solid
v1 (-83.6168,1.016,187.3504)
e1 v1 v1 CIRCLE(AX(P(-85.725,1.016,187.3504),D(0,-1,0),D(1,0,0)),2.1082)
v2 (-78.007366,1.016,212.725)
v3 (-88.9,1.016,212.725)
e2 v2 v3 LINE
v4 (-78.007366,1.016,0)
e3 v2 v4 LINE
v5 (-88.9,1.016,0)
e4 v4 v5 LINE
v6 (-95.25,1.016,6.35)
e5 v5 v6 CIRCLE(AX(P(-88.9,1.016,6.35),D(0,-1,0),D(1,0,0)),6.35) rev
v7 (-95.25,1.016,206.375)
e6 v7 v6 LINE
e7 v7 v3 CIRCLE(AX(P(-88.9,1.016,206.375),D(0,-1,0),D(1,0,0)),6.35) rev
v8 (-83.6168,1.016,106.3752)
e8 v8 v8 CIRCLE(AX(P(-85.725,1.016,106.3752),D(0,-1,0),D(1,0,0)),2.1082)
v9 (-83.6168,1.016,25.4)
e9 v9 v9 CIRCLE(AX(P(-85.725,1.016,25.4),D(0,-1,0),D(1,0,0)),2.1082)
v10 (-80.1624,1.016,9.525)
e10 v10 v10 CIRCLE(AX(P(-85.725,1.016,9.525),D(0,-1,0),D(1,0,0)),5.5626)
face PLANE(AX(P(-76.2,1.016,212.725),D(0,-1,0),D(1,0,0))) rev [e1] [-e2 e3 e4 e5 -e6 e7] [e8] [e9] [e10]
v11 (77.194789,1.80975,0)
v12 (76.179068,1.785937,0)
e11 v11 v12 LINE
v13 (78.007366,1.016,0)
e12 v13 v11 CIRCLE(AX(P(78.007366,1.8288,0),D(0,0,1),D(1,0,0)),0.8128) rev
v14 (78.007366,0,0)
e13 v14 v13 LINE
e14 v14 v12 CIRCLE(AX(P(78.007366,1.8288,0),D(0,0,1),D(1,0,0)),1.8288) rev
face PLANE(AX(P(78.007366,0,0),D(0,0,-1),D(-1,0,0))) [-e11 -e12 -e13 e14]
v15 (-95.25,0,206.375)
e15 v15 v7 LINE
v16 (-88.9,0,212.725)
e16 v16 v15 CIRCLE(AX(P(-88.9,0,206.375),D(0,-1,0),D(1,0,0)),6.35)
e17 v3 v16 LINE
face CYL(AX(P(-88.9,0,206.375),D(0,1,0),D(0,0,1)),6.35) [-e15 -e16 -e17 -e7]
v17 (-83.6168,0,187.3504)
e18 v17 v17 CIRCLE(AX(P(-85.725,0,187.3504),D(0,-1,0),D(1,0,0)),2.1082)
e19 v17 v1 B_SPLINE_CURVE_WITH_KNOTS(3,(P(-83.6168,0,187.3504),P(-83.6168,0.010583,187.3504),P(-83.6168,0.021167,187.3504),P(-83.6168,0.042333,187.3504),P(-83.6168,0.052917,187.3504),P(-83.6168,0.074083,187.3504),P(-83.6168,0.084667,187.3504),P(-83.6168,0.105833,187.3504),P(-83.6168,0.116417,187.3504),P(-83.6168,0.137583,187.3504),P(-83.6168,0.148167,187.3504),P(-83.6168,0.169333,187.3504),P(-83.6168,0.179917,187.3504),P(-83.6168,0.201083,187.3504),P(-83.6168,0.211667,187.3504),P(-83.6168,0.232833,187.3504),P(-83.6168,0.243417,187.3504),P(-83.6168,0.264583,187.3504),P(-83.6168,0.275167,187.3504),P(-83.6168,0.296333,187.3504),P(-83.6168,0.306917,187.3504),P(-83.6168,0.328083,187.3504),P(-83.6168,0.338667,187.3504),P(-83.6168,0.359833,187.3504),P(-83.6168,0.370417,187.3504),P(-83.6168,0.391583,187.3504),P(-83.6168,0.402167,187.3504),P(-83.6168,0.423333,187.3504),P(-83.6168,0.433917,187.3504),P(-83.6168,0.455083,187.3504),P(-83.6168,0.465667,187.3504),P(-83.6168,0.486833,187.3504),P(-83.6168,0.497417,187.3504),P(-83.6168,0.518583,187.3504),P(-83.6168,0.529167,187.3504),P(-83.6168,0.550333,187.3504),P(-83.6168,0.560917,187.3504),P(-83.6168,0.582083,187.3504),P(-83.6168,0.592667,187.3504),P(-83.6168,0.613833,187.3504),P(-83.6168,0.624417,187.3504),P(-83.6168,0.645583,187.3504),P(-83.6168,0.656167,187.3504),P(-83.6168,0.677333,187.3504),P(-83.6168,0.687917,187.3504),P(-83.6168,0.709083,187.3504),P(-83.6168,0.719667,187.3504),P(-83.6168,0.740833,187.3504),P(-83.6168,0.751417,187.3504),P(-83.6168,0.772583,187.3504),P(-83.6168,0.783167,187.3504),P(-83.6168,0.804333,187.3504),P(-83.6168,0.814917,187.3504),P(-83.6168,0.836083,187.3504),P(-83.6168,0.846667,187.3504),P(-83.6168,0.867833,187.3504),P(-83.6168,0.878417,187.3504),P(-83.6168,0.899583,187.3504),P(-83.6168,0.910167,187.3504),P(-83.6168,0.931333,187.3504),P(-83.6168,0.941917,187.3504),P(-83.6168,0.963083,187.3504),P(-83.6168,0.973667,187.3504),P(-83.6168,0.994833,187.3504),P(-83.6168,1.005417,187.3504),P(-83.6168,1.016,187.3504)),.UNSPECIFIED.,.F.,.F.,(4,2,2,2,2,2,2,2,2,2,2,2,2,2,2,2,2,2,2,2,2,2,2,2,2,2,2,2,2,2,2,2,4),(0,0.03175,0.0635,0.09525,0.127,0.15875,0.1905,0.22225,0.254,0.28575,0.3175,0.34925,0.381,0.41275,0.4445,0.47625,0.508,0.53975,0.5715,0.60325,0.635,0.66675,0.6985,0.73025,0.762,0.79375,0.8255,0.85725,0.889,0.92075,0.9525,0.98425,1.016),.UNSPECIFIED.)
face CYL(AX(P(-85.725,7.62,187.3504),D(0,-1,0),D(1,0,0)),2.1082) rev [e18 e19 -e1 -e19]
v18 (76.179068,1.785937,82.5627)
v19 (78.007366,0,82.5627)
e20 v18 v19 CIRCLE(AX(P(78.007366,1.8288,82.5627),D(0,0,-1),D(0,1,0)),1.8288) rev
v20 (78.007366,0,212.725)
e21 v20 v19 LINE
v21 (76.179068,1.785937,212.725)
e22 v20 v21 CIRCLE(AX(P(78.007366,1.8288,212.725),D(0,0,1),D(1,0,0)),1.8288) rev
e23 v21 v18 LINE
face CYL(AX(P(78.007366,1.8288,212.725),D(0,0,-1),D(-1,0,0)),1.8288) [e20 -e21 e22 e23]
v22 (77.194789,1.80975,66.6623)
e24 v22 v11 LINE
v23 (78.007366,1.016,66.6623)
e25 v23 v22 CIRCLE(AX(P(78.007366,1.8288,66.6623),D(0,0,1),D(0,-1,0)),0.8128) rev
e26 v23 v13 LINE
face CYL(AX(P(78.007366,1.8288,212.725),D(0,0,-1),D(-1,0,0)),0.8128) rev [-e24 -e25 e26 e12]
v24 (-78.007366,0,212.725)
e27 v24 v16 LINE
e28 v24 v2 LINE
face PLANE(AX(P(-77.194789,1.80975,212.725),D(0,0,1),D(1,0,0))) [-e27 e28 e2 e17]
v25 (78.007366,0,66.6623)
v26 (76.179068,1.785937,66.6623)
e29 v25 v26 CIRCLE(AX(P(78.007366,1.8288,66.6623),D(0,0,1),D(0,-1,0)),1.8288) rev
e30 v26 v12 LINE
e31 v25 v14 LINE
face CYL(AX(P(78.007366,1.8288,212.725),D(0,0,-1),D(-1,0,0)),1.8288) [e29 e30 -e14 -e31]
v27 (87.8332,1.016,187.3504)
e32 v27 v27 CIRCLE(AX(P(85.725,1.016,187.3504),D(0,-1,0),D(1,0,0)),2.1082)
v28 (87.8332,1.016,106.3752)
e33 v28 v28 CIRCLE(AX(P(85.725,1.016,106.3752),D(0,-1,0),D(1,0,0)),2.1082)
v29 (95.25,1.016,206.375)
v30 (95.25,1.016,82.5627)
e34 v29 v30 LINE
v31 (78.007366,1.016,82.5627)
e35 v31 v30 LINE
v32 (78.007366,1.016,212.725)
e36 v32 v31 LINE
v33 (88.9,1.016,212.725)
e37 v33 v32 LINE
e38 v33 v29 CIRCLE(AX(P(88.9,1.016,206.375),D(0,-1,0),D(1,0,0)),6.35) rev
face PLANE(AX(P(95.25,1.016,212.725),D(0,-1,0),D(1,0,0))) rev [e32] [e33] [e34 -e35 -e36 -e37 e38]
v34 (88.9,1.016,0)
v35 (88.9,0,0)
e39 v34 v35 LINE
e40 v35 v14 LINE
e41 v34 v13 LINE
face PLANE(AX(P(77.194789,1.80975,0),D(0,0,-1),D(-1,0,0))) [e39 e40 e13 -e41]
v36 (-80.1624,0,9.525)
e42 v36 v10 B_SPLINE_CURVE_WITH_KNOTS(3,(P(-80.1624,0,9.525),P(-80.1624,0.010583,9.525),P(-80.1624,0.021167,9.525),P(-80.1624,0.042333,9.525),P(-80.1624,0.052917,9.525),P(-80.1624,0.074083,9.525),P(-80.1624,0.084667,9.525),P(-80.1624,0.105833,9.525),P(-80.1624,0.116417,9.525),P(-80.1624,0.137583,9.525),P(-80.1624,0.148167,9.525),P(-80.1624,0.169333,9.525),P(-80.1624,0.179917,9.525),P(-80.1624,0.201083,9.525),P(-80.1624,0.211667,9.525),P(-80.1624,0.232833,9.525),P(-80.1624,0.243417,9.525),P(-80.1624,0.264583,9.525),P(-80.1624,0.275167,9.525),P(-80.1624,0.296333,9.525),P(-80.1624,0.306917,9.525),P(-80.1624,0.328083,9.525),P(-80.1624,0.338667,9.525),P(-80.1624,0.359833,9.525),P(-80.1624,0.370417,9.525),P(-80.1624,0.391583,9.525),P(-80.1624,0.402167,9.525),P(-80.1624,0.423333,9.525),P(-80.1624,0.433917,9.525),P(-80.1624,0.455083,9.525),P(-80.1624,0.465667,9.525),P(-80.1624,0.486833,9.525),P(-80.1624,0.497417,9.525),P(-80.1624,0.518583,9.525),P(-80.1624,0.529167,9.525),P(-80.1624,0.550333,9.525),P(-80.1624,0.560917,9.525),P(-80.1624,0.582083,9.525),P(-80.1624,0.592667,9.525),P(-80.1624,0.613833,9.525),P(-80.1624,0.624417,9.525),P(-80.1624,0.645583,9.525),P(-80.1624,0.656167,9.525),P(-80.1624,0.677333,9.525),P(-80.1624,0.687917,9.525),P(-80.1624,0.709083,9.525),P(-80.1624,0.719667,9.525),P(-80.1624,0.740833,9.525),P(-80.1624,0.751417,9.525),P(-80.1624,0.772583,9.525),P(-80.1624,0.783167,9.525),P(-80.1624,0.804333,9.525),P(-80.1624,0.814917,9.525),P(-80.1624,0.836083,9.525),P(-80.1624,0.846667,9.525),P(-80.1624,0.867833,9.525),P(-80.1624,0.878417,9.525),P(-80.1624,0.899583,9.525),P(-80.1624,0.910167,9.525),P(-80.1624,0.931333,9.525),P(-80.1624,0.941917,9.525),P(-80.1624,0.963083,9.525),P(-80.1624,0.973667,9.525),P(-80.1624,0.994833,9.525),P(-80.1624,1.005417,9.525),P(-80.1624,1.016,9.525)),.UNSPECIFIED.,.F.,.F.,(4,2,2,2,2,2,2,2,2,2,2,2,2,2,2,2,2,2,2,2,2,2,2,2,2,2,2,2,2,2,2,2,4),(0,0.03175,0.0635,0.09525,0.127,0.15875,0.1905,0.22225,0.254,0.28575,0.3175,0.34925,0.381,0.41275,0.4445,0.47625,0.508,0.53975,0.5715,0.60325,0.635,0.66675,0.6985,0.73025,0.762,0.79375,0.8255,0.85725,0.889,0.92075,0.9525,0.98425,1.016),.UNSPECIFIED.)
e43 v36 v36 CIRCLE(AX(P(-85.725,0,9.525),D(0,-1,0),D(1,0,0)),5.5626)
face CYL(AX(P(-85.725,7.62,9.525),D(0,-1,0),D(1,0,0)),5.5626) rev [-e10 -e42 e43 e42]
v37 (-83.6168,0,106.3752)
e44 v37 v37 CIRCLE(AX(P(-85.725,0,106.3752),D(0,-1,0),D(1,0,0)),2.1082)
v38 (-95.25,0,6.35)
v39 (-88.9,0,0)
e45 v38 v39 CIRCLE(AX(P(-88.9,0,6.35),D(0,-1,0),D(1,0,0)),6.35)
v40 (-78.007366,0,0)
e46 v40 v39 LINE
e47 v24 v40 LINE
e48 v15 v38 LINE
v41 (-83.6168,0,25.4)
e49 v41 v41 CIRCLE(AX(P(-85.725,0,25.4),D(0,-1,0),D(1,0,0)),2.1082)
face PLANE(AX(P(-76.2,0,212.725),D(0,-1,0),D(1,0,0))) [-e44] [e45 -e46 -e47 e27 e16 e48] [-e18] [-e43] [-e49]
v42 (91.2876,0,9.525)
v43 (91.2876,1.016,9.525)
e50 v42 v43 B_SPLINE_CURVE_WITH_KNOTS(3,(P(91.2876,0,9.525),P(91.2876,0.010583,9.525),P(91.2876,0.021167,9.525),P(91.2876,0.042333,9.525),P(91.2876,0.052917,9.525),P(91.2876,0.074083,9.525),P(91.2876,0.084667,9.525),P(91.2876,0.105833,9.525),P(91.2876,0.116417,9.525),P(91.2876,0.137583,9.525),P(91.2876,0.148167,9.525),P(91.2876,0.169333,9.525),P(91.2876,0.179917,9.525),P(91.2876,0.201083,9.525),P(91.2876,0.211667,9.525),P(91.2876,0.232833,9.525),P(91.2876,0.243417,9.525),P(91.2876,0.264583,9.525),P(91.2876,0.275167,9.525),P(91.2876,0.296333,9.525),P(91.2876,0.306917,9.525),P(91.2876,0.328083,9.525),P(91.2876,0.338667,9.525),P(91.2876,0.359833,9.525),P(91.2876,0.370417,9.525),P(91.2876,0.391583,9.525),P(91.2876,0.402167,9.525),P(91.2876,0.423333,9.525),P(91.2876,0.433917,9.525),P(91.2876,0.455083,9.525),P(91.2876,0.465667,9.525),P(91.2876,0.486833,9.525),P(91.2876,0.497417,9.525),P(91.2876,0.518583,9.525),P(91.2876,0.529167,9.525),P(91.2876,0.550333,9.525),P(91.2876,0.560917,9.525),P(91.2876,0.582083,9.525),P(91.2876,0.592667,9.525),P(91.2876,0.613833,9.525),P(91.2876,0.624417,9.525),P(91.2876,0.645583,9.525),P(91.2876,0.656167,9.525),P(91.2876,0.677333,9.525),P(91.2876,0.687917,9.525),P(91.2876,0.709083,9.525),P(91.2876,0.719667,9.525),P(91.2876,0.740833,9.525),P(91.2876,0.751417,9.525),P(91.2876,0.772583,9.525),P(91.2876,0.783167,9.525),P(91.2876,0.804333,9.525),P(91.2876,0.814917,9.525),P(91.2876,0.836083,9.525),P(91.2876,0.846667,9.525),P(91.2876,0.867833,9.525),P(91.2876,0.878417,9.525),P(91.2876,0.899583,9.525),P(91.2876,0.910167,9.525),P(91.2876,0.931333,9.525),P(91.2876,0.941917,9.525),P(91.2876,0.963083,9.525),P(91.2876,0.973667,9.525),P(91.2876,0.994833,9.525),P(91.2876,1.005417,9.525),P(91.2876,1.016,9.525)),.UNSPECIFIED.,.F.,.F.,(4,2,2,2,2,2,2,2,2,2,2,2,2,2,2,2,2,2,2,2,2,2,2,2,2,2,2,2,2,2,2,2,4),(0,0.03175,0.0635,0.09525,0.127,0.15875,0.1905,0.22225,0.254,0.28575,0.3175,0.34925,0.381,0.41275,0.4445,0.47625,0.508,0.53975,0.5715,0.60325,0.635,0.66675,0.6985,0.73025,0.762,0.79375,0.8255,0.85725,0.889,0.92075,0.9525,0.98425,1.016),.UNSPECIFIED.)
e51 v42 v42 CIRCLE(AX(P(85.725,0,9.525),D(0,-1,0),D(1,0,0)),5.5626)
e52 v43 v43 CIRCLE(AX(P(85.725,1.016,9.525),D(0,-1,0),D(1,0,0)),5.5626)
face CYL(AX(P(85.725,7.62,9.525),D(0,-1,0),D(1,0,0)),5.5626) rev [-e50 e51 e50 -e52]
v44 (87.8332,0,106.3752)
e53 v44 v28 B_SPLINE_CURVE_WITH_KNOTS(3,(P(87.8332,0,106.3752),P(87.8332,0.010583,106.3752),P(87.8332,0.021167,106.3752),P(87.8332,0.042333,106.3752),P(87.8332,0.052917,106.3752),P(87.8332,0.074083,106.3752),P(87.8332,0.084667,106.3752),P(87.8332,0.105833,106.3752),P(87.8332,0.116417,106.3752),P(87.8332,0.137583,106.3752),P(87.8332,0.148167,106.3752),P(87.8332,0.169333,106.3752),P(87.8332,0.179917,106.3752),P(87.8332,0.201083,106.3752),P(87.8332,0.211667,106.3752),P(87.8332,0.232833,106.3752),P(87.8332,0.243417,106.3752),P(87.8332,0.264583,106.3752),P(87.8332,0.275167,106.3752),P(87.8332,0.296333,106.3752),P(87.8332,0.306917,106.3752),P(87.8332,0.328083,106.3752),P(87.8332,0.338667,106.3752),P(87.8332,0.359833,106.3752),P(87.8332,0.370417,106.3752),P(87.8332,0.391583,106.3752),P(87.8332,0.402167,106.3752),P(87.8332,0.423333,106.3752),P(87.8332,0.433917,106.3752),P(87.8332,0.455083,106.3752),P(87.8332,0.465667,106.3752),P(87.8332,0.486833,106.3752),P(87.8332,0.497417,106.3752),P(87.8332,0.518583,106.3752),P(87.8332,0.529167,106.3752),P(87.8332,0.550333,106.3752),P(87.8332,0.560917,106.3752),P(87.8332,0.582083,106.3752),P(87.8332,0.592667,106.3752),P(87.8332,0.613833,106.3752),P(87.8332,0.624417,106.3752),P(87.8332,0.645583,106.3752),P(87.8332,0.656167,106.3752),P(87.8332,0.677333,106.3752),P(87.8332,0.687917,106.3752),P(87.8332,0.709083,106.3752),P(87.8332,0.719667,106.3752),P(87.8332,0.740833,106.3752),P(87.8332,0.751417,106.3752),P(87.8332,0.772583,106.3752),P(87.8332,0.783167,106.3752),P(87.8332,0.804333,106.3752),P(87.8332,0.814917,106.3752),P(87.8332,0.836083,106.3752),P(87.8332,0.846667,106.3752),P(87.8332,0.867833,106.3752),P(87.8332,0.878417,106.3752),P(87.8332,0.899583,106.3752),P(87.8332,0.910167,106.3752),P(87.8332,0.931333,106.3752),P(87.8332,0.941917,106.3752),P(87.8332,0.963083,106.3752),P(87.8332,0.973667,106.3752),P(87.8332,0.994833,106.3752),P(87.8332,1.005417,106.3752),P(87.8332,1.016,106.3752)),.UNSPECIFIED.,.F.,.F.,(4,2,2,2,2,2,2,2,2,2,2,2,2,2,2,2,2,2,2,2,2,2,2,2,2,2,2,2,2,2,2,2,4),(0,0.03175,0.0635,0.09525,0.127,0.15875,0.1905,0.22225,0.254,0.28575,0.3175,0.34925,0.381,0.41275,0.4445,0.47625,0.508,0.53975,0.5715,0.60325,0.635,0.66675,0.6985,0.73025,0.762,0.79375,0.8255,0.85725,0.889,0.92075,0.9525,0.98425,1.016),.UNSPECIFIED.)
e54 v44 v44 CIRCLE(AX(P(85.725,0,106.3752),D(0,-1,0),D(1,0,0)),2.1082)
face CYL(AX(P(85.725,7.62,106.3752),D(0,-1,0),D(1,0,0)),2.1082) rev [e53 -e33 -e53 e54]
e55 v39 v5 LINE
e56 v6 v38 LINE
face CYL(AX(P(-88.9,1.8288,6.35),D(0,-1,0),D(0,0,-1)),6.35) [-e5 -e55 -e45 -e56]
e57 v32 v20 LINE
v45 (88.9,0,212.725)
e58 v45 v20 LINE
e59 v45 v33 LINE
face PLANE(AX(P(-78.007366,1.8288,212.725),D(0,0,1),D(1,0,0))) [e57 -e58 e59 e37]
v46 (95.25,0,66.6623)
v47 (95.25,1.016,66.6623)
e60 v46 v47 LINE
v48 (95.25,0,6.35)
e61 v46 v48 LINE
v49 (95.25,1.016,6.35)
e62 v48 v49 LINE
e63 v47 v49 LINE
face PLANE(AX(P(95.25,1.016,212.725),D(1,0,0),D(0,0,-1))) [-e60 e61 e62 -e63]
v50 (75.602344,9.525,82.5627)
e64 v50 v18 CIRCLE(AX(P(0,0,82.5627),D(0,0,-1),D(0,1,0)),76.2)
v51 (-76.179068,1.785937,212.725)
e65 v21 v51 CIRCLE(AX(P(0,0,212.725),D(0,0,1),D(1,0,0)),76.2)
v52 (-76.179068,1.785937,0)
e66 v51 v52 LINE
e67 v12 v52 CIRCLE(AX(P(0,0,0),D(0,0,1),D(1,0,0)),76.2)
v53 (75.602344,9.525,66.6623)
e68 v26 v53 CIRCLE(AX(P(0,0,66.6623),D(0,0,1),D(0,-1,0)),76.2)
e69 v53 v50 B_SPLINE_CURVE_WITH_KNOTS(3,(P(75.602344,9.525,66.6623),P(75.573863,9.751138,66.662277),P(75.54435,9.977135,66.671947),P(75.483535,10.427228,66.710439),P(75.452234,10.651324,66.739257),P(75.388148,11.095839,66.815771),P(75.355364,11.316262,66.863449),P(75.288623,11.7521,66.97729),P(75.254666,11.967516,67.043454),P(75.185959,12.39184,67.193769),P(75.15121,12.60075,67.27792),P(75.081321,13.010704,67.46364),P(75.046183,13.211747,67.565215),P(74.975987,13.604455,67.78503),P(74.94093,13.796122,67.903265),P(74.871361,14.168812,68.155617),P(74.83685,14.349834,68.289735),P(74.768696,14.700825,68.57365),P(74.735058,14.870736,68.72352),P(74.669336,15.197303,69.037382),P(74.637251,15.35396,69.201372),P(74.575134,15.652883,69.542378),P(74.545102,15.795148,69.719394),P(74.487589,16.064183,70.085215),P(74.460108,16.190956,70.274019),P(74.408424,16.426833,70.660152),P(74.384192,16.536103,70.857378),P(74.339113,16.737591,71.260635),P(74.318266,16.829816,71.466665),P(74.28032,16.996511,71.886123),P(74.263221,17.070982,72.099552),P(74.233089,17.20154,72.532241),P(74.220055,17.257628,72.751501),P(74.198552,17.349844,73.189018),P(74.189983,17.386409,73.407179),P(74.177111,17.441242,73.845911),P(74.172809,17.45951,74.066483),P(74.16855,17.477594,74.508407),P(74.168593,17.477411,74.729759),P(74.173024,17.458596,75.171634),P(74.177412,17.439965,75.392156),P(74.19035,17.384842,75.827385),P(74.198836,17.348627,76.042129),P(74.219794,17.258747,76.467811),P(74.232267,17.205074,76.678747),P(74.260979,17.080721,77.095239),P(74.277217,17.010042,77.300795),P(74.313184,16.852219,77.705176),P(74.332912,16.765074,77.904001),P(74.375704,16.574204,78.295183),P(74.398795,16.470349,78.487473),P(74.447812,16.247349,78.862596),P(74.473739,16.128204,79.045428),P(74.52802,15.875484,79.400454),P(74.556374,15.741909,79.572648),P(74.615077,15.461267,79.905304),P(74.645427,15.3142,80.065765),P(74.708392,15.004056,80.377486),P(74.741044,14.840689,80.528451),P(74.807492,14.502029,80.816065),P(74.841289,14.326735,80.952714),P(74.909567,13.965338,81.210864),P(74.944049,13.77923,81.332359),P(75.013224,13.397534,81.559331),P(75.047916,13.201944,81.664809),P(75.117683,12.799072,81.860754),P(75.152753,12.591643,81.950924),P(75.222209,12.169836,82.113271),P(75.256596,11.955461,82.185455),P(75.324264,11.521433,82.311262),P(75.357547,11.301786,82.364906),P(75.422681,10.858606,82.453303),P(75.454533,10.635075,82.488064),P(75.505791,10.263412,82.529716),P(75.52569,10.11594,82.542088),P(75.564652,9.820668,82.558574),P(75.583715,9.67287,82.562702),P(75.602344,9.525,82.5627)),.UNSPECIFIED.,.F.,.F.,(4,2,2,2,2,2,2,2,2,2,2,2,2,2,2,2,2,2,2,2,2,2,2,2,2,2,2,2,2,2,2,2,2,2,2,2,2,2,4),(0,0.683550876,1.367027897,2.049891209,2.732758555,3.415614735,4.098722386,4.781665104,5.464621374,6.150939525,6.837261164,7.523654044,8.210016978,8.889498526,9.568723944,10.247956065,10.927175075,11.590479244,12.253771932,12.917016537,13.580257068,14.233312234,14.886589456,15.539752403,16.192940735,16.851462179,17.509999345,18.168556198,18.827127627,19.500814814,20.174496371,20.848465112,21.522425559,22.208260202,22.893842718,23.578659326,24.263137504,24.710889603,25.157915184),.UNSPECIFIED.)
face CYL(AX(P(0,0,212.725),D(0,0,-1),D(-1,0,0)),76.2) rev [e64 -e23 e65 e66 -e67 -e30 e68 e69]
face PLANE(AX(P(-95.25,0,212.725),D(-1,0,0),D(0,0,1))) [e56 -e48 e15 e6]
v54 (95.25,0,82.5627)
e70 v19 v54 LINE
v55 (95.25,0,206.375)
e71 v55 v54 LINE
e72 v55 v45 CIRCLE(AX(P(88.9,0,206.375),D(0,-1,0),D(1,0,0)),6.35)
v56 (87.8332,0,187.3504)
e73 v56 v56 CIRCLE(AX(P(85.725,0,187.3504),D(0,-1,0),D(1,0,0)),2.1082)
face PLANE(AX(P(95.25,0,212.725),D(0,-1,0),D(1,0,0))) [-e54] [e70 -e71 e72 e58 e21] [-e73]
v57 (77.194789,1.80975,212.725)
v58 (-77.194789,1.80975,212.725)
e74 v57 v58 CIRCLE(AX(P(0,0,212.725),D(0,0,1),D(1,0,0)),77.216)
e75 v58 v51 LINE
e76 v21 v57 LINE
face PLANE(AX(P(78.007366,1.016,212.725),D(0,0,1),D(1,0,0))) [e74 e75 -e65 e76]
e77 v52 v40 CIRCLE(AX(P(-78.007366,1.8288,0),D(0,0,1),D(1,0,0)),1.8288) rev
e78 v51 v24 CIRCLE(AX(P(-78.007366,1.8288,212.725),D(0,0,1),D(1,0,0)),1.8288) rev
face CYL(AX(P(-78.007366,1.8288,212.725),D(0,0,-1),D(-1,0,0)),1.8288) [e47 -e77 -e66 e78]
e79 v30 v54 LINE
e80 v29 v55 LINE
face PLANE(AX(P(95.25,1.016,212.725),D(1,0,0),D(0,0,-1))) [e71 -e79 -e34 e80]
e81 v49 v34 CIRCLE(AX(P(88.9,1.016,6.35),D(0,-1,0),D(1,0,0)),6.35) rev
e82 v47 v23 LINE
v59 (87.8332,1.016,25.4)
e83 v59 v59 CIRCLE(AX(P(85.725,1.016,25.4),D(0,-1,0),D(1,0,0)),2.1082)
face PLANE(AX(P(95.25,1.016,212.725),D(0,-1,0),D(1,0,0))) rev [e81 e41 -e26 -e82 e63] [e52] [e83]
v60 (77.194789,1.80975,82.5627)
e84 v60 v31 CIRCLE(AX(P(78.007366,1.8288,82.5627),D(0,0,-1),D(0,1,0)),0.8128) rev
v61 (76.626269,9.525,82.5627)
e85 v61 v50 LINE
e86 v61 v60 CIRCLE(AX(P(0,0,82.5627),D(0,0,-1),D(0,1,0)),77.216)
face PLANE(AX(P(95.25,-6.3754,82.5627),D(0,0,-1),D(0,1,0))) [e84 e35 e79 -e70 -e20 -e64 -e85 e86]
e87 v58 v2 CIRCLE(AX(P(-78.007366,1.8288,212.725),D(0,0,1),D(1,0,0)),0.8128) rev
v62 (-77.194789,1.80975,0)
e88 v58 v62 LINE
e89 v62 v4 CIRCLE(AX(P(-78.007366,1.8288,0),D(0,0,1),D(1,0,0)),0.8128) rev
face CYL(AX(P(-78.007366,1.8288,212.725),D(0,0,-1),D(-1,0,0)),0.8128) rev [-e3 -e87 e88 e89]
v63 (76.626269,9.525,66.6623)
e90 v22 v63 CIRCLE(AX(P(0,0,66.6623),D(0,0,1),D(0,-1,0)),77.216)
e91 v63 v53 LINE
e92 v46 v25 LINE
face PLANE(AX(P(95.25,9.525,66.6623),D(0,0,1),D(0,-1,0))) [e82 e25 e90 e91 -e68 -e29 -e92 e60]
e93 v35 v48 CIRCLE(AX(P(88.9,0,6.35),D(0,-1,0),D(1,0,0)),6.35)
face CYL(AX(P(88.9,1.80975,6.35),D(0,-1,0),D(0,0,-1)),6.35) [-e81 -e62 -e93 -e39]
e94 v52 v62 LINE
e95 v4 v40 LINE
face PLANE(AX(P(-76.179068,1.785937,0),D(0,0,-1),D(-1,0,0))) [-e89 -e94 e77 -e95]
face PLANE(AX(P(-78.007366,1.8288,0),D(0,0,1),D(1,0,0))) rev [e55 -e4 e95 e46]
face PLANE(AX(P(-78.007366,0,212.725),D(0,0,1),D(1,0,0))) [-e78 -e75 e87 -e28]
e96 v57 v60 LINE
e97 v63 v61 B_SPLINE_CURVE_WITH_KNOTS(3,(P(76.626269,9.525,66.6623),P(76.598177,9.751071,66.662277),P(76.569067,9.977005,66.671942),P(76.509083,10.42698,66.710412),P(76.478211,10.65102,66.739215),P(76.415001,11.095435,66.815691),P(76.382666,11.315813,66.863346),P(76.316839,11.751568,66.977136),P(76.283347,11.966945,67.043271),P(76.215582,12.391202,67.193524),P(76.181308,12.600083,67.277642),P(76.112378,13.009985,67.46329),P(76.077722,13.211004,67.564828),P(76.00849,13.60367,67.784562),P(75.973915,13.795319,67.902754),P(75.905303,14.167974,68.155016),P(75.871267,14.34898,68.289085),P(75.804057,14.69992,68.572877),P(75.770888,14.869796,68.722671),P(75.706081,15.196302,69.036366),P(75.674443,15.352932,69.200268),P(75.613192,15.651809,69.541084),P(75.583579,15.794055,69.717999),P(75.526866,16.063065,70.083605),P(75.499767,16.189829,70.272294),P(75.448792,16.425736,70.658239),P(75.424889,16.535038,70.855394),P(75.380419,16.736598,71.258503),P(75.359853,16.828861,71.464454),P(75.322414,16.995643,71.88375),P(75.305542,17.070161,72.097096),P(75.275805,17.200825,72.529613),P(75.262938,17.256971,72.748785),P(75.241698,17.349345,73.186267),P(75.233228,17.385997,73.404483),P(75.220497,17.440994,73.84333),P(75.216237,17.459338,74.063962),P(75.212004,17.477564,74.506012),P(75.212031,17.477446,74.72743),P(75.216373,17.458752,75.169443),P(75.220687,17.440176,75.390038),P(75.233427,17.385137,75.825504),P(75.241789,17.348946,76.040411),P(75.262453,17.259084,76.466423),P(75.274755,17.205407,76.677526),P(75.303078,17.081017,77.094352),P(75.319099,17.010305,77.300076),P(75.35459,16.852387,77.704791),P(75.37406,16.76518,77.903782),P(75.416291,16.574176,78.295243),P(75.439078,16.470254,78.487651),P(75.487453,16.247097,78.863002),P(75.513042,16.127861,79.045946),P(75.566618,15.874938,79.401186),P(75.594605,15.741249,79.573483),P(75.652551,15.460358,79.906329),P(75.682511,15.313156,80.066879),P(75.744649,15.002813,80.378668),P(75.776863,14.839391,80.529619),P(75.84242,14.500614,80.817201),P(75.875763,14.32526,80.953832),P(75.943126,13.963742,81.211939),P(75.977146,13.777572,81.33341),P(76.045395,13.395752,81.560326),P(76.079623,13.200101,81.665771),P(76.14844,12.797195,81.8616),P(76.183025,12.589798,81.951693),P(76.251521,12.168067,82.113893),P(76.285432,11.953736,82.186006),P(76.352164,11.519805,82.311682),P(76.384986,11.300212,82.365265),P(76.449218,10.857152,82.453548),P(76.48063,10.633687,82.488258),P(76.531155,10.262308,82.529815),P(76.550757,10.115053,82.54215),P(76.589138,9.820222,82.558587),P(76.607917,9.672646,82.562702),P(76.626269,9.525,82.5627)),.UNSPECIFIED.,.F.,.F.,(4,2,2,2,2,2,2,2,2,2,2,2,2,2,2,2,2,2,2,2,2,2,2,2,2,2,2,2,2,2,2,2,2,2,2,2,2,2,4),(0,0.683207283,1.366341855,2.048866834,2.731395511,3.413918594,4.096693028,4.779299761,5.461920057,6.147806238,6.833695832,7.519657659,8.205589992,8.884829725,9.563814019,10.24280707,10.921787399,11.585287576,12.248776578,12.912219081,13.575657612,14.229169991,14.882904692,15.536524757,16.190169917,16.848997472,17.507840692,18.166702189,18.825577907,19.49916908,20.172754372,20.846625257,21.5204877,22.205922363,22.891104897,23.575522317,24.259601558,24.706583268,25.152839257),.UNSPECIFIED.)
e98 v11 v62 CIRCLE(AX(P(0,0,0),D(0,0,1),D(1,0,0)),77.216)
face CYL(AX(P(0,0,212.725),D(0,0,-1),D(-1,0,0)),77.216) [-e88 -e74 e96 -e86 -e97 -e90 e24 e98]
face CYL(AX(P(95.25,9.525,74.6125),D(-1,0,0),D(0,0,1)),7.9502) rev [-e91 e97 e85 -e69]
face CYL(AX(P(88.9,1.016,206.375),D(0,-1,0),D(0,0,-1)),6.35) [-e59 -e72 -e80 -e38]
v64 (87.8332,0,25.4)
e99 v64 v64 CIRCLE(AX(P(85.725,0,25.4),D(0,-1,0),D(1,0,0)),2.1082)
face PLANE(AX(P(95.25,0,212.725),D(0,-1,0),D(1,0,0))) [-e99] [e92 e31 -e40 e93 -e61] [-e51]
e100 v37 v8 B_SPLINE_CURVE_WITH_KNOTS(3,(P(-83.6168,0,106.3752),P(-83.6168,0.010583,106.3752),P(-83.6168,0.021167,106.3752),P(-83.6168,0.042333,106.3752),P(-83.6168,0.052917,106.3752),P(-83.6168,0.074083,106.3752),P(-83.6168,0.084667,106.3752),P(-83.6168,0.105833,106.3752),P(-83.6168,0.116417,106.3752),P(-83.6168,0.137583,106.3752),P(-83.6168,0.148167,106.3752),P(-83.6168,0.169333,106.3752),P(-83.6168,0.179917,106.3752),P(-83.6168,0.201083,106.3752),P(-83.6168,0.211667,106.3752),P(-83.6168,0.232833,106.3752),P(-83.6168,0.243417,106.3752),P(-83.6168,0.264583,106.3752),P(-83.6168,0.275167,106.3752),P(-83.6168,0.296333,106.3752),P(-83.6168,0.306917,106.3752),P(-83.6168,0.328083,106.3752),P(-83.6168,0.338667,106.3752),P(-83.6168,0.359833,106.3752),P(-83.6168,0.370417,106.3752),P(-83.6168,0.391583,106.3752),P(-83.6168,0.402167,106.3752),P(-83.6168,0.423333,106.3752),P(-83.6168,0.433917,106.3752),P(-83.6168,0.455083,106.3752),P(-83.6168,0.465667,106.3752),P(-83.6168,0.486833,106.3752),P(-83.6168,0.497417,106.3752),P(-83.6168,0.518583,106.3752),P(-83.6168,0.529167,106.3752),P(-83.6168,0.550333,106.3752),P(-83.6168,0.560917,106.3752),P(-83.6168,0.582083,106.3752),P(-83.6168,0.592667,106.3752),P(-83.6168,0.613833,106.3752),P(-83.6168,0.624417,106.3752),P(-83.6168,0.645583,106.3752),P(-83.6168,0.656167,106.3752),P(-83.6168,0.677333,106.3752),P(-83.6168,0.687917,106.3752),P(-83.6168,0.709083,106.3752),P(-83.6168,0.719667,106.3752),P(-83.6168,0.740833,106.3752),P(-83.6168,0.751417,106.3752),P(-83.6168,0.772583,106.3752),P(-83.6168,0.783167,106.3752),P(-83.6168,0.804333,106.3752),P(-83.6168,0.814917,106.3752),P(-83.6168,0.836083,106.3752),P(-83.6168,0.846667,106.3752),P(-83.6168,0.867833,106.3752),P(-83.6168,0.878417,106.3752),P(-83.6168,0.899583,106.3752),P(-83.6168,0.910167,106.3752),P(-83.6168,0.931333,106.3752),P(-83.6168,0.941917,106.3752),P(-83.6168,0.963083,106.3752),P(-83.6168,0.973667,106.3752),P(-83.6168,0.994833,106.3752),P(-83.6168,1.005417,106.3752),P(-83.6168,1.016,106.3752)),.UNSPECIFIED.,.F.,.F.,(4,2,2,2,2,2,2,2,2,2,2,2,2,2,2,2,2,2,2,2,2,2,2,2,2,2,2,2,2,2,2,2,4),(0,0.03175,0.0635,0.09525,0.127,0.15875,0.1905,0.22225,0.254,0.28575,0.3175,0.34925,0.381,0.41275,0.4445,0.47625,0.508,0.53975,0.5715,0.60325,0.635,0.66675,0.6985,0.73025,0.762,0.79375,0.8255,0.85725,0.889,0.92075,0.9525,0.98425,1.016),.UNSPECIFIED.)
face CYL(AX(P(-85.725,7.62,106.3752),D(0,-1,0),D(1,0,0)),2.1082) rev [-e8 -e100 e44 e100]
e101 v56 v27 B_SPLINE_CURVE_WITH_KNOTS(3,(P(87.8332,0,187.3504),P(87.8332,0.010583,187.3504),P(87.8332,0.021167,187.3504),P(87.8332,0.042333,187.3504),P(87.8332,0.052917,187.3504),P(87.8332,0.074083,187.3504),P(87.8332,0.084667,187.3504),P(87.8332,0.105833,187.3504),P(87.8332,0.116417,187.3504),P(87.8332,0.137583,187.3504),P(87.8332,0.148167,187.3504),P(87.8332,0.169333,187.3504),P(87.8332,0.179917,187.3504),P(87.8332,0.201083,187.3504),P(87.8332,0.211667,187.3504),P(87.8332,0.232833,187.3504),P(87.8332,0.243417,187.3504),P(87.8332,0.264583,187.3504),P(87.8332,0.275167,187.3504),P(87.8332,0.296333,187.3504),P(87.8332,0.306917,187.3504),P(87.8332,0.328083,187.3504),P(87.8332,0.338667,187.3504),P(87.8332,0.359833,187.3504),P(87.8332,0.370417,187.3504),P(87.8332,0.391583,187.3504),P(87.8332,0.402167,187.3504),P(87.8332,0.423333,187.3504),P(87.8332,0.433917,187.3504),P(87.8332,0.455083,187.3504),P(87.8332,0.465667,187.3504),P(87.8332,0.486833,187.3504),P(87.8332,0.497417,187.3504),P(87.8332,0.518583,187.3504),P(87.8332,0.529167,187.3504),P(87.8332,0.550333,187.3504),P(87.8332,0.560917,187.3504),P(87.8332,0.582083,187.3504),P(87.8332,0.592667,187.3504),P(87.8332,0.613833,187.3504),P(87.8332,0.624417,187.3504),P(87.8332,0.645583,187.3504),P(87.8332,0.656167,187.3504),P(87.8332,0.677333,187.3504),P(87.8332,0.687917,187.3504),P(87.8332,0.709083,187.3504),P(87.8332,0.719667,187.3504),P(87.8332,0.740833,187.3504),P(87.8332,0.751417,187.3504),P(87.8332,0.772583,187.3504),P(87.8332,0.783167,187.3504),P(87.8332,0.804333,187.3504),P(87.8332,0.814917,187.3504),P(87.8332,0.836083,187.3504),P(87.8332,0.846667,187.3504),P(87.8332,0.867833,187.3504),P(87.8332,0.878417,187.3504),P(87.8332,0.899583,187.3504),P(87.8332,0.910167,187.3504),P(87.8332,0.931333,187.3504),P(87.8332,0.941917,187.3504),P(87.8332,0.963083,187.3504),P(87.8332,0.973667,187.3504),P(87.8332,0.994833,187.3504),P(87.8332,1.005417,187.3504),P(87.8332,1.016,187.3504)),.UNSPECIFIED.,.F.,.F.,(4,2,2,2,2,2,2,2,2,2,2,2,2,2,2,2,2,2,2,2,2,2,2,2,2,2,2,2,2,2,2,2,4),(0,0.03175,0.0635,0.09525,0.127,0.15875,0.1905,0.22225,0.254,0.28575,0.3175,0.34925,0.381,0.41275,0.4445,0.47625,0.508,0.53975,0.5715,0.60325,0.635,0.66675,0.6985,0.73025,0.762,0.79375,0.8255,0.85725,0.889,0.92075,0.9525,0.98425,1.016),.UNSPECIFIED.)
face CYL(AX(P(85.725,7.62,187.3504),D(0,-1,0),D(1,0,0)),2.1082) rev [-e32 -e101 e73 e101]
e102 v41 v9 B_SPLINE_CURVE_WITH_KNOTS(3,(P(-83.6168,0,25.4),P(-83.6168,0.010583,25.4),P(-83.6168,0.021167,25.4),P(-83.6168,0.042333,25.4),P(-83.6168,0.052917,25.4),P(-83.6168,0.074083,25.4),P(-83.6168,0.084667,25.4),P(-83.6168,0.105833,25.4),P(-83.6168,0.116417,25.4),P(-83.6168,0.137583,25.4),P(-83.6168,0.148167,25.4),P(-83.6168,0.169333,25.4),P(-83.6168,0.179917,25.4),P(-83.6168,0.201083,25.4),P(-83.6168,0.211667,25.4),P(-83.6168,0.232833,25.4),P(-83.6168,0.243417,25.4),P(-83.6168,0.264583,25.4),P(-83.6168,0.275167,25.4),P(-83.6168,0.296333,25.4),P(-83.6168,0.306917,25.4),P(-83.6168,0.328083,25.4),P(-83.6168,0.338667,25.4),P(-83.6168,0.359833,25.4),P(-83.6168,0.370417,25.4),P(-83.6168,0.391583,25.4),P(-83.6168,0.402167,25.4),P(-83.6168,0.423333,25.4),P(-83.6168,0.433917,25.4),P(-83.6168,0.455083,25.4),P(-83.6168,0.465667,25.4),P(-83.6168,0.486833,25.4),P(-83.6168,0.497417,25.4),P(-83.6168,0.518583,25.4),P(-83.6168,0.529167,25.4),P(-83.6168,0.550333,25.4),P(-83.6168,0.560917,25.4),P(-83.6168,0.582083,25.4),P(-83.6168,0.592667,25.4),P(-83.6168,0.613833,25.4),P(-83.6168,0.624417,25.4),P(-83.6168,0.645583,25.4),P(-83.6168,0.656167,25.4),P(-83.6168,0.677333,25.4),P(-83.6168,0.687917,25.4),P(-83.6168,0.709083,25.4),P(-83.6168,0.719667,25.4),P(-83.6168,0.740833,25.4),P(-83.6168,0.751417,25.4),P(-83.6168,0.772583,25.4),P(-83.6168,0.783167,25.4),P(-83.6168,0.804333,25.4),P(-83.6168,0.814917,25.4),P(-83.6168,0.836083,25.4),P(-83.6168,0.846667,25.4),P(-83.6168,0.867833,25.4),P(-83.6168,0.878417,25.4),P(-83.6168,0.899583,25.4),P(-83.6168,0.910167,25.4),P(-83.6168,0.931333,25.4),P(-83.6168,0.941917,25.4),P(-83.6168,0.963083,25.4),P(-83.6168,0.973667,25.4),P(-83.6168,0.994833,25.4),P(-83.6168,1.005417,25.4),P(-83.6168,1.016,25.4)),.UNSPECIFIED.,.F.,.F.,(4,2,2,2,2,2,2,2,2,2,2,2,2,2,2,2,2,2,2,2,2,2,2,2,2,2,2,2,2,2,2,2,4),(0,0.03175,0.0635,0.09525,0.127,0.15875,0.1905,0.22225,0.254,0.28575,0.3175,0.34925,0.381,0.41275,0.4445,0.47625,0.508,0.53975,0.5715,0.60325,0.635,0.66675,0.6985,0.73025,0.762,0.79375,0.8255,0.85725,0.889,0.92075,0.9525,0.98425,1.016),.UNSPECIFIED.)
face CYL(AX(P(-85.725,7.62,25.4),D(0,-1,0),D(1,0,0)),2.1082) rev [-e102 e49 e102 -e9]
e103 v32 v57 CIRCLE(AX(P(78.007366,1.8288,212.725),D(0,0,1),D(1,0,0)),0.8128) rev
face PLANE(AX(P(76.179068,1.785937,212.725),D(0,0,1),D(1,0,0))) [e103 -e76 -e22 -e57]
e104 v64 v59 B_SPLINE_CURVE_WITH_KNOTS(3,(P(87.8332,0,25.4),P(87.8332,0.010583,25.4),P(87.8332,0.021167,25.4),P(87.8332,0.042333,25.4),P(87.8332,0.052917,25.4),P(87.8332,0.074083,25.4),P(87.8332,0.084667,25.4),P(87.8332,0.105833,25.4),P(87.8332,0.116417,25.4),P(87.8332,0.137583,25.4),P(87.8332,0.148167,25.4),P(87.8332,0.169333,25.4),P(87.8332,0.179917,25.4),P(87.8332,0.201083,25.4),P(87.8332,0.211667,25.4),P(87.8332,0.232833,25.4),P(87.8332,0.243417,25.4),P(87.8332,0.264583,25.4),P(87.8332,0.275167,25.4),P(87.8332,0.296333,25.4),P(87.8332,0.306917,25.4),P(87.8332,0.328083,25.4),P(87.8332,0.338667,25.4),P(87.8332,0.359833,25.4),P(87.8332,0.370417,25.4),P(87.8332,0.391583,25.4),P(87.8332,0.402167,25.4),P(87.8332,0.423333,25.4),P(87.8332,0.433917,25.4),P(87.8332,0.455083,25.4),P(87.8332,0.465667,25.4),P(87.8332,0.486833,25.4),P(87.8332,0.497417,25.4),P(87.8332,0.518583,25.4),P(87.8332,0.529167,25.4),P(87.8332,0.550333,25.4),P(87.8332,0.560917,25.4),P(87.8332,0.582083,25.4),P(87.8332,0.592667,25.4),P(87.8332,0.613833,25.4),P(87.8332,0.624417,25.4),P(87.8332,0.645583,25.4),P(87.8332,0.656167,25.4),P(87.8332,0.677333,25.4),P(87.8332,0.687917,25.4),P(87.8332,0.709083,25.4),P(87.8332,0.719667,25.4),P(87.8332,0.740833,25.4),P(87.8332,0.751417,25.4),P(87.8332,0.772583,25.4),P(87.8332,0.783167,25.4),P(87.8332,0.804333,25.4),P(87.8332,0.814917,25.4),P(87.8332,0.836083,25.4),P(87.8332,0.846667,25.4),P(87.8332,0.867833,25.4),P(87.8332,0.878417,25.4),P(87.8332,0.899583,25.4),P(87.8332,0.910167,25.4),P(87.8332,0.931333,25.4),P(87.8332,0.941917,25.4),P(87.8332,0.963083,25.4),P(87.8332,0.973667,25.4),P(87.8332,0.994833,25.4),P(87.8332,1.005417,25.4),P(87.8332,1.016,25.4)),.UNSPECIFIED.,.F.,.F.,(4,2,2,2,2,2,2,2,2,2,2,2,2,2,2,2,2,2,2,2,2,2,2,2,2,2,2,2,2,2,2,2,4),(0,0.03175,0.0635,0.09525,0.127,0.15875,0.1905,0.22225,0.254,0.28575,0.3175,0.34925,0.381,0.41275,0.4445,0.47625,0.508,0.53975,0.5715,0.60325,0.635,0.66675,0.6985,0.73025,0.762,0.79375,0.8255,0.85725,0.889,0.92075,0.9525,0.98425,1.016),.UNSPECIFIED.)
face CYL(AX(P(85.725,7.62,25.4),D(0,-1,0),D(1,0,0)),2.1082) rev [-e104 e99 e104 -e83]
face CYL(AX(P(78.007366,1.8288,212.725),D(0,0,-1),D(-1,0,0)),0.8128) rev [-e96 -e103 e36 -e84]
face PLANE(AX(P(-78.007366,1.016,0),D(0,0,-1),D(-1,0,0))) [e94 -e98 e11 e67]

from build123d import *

# Parameters (mm, degrees)
BASE_FLANGE1_DEPTH = 212.725
FILLET1_R          = 6.35
SKETCH3_R          = 5.5626
SKETCH3_R_2        = 2.1082
CUT_EXTRUDE1_DEPTH = 7.62
CUT_EXTRUDE2_DEPTH = 246.533701925


# Read off the part's stored shape, not the designer's step: Base-Flange1
with BuildPart() as part:
    # Base-Flange1 outline → Base-Flange1 (new body)
    with BuildSketch(Plane.XY):
        with BuildLine():
            Line((-78.007365806, 1.016), (-95.25, 1.016))
            Line((-95.25, 1.016), (-95.25, 0))
            Line((-95.25, 0), (-78.007365806, 0))
            ThreePointArc((-78.007365806, 0), (-76.729452957, 0.520576705), (-76.17906817, 1.7859375))
            ThreePointArc((-76.17906817, 1.7859375), (0, 76.2), (76.17906817, 1.7859375))
            ThreePointArc((76.17906817, 1.7859375), (76.729452957, 0.520576705), (78.007365806, 0))
            Line((78.007365806, 0), (95.25, 0))
            Line((95.25, 0), (95.25, 1.016))
            Line((95.25, 1.016), (78.007365806, 1.016))
            ThreePointArc((78.007365806, 1.016), (77.43940454, 1.247367424), (77.194789079, 1.80975))
            ThreePointArc((77.194789079, 1.80975), (0, 77.216), (-77.194789079, 1.80975))
            ThreePointArc((-77.194789079, 1.80975), (-77.43940454, 1.247367424), (-78.007365806, 1.016))
        make_face()
    extrude(amount=BASE_FLANGE1_DEPTH)

    # Fillet1
    fillet1_edges = [part.edges().sort_by_distance(p)[0] for p in [
        (95.25, 0.508, 0),
        (-95.25, 0.508, 0),
        (95.25, 0.508, 212.725),
        (-95.25, 0.508, 212.725),
    ]]
    fillet(fillet1_edges, radius=FILLET1_R)

    # Sketch3 → Cut-Extrude1 (cut)
    with BuildSketch(Plane.XZ):
        with Locations((-85.725, 9.525)):
            Circle(SKETCH3_R)
        with Locations((-85.725, 25.4)):
            Circle(SKETCH3_R_2)
        with Locations((-85.725, 106.3752)):
            Circle(SKETCH3_R_2)
        with Locations((-85.725, 187.3504)):
            Circle(SKETCH3_R_2)
        with Locations((85.725, 9.525)):
            Circle(SKETCH3_R)
        with Locations((85.725, 25.4)):
            Circle(SKETCH3_R_2)
        with Locations((85.725, 106.3752)):
            Circle(SKETCH3_R_2)
        with Locations((85.725, 187.3504)):
            Circle(SKETCH3_R_2)
    extrude(amount=-CUT_EXTRUDE1_DEPTH, mode=Mode.SUBTRACT)

    # Sketch4 → Cut-Extrude2 (cut, through all)
    with BuildSketch(Plane(origin=(0, 0, 0), x_dir=(0, 0, -1), z_dir=(1, 0, 0))):
        with BuildLine():
            Line((-82.5627, -6.3754), (-82.5627, 9.525))
            ThreePointArc((-82.5627, 9.525), (-74.6125, 17.4752), (-66.6623, 9.525))
            Line((-66.6623, 9.525), (-66.6623, -6.3754))
            Line((-66.6623, -6.3754), (-82.5627, -6.3754))
        make_face()
    extrude(amount=CUT_EXTRUDE2_DEPTH, mode=Mode.SUBTRACT)


solid = part.part
